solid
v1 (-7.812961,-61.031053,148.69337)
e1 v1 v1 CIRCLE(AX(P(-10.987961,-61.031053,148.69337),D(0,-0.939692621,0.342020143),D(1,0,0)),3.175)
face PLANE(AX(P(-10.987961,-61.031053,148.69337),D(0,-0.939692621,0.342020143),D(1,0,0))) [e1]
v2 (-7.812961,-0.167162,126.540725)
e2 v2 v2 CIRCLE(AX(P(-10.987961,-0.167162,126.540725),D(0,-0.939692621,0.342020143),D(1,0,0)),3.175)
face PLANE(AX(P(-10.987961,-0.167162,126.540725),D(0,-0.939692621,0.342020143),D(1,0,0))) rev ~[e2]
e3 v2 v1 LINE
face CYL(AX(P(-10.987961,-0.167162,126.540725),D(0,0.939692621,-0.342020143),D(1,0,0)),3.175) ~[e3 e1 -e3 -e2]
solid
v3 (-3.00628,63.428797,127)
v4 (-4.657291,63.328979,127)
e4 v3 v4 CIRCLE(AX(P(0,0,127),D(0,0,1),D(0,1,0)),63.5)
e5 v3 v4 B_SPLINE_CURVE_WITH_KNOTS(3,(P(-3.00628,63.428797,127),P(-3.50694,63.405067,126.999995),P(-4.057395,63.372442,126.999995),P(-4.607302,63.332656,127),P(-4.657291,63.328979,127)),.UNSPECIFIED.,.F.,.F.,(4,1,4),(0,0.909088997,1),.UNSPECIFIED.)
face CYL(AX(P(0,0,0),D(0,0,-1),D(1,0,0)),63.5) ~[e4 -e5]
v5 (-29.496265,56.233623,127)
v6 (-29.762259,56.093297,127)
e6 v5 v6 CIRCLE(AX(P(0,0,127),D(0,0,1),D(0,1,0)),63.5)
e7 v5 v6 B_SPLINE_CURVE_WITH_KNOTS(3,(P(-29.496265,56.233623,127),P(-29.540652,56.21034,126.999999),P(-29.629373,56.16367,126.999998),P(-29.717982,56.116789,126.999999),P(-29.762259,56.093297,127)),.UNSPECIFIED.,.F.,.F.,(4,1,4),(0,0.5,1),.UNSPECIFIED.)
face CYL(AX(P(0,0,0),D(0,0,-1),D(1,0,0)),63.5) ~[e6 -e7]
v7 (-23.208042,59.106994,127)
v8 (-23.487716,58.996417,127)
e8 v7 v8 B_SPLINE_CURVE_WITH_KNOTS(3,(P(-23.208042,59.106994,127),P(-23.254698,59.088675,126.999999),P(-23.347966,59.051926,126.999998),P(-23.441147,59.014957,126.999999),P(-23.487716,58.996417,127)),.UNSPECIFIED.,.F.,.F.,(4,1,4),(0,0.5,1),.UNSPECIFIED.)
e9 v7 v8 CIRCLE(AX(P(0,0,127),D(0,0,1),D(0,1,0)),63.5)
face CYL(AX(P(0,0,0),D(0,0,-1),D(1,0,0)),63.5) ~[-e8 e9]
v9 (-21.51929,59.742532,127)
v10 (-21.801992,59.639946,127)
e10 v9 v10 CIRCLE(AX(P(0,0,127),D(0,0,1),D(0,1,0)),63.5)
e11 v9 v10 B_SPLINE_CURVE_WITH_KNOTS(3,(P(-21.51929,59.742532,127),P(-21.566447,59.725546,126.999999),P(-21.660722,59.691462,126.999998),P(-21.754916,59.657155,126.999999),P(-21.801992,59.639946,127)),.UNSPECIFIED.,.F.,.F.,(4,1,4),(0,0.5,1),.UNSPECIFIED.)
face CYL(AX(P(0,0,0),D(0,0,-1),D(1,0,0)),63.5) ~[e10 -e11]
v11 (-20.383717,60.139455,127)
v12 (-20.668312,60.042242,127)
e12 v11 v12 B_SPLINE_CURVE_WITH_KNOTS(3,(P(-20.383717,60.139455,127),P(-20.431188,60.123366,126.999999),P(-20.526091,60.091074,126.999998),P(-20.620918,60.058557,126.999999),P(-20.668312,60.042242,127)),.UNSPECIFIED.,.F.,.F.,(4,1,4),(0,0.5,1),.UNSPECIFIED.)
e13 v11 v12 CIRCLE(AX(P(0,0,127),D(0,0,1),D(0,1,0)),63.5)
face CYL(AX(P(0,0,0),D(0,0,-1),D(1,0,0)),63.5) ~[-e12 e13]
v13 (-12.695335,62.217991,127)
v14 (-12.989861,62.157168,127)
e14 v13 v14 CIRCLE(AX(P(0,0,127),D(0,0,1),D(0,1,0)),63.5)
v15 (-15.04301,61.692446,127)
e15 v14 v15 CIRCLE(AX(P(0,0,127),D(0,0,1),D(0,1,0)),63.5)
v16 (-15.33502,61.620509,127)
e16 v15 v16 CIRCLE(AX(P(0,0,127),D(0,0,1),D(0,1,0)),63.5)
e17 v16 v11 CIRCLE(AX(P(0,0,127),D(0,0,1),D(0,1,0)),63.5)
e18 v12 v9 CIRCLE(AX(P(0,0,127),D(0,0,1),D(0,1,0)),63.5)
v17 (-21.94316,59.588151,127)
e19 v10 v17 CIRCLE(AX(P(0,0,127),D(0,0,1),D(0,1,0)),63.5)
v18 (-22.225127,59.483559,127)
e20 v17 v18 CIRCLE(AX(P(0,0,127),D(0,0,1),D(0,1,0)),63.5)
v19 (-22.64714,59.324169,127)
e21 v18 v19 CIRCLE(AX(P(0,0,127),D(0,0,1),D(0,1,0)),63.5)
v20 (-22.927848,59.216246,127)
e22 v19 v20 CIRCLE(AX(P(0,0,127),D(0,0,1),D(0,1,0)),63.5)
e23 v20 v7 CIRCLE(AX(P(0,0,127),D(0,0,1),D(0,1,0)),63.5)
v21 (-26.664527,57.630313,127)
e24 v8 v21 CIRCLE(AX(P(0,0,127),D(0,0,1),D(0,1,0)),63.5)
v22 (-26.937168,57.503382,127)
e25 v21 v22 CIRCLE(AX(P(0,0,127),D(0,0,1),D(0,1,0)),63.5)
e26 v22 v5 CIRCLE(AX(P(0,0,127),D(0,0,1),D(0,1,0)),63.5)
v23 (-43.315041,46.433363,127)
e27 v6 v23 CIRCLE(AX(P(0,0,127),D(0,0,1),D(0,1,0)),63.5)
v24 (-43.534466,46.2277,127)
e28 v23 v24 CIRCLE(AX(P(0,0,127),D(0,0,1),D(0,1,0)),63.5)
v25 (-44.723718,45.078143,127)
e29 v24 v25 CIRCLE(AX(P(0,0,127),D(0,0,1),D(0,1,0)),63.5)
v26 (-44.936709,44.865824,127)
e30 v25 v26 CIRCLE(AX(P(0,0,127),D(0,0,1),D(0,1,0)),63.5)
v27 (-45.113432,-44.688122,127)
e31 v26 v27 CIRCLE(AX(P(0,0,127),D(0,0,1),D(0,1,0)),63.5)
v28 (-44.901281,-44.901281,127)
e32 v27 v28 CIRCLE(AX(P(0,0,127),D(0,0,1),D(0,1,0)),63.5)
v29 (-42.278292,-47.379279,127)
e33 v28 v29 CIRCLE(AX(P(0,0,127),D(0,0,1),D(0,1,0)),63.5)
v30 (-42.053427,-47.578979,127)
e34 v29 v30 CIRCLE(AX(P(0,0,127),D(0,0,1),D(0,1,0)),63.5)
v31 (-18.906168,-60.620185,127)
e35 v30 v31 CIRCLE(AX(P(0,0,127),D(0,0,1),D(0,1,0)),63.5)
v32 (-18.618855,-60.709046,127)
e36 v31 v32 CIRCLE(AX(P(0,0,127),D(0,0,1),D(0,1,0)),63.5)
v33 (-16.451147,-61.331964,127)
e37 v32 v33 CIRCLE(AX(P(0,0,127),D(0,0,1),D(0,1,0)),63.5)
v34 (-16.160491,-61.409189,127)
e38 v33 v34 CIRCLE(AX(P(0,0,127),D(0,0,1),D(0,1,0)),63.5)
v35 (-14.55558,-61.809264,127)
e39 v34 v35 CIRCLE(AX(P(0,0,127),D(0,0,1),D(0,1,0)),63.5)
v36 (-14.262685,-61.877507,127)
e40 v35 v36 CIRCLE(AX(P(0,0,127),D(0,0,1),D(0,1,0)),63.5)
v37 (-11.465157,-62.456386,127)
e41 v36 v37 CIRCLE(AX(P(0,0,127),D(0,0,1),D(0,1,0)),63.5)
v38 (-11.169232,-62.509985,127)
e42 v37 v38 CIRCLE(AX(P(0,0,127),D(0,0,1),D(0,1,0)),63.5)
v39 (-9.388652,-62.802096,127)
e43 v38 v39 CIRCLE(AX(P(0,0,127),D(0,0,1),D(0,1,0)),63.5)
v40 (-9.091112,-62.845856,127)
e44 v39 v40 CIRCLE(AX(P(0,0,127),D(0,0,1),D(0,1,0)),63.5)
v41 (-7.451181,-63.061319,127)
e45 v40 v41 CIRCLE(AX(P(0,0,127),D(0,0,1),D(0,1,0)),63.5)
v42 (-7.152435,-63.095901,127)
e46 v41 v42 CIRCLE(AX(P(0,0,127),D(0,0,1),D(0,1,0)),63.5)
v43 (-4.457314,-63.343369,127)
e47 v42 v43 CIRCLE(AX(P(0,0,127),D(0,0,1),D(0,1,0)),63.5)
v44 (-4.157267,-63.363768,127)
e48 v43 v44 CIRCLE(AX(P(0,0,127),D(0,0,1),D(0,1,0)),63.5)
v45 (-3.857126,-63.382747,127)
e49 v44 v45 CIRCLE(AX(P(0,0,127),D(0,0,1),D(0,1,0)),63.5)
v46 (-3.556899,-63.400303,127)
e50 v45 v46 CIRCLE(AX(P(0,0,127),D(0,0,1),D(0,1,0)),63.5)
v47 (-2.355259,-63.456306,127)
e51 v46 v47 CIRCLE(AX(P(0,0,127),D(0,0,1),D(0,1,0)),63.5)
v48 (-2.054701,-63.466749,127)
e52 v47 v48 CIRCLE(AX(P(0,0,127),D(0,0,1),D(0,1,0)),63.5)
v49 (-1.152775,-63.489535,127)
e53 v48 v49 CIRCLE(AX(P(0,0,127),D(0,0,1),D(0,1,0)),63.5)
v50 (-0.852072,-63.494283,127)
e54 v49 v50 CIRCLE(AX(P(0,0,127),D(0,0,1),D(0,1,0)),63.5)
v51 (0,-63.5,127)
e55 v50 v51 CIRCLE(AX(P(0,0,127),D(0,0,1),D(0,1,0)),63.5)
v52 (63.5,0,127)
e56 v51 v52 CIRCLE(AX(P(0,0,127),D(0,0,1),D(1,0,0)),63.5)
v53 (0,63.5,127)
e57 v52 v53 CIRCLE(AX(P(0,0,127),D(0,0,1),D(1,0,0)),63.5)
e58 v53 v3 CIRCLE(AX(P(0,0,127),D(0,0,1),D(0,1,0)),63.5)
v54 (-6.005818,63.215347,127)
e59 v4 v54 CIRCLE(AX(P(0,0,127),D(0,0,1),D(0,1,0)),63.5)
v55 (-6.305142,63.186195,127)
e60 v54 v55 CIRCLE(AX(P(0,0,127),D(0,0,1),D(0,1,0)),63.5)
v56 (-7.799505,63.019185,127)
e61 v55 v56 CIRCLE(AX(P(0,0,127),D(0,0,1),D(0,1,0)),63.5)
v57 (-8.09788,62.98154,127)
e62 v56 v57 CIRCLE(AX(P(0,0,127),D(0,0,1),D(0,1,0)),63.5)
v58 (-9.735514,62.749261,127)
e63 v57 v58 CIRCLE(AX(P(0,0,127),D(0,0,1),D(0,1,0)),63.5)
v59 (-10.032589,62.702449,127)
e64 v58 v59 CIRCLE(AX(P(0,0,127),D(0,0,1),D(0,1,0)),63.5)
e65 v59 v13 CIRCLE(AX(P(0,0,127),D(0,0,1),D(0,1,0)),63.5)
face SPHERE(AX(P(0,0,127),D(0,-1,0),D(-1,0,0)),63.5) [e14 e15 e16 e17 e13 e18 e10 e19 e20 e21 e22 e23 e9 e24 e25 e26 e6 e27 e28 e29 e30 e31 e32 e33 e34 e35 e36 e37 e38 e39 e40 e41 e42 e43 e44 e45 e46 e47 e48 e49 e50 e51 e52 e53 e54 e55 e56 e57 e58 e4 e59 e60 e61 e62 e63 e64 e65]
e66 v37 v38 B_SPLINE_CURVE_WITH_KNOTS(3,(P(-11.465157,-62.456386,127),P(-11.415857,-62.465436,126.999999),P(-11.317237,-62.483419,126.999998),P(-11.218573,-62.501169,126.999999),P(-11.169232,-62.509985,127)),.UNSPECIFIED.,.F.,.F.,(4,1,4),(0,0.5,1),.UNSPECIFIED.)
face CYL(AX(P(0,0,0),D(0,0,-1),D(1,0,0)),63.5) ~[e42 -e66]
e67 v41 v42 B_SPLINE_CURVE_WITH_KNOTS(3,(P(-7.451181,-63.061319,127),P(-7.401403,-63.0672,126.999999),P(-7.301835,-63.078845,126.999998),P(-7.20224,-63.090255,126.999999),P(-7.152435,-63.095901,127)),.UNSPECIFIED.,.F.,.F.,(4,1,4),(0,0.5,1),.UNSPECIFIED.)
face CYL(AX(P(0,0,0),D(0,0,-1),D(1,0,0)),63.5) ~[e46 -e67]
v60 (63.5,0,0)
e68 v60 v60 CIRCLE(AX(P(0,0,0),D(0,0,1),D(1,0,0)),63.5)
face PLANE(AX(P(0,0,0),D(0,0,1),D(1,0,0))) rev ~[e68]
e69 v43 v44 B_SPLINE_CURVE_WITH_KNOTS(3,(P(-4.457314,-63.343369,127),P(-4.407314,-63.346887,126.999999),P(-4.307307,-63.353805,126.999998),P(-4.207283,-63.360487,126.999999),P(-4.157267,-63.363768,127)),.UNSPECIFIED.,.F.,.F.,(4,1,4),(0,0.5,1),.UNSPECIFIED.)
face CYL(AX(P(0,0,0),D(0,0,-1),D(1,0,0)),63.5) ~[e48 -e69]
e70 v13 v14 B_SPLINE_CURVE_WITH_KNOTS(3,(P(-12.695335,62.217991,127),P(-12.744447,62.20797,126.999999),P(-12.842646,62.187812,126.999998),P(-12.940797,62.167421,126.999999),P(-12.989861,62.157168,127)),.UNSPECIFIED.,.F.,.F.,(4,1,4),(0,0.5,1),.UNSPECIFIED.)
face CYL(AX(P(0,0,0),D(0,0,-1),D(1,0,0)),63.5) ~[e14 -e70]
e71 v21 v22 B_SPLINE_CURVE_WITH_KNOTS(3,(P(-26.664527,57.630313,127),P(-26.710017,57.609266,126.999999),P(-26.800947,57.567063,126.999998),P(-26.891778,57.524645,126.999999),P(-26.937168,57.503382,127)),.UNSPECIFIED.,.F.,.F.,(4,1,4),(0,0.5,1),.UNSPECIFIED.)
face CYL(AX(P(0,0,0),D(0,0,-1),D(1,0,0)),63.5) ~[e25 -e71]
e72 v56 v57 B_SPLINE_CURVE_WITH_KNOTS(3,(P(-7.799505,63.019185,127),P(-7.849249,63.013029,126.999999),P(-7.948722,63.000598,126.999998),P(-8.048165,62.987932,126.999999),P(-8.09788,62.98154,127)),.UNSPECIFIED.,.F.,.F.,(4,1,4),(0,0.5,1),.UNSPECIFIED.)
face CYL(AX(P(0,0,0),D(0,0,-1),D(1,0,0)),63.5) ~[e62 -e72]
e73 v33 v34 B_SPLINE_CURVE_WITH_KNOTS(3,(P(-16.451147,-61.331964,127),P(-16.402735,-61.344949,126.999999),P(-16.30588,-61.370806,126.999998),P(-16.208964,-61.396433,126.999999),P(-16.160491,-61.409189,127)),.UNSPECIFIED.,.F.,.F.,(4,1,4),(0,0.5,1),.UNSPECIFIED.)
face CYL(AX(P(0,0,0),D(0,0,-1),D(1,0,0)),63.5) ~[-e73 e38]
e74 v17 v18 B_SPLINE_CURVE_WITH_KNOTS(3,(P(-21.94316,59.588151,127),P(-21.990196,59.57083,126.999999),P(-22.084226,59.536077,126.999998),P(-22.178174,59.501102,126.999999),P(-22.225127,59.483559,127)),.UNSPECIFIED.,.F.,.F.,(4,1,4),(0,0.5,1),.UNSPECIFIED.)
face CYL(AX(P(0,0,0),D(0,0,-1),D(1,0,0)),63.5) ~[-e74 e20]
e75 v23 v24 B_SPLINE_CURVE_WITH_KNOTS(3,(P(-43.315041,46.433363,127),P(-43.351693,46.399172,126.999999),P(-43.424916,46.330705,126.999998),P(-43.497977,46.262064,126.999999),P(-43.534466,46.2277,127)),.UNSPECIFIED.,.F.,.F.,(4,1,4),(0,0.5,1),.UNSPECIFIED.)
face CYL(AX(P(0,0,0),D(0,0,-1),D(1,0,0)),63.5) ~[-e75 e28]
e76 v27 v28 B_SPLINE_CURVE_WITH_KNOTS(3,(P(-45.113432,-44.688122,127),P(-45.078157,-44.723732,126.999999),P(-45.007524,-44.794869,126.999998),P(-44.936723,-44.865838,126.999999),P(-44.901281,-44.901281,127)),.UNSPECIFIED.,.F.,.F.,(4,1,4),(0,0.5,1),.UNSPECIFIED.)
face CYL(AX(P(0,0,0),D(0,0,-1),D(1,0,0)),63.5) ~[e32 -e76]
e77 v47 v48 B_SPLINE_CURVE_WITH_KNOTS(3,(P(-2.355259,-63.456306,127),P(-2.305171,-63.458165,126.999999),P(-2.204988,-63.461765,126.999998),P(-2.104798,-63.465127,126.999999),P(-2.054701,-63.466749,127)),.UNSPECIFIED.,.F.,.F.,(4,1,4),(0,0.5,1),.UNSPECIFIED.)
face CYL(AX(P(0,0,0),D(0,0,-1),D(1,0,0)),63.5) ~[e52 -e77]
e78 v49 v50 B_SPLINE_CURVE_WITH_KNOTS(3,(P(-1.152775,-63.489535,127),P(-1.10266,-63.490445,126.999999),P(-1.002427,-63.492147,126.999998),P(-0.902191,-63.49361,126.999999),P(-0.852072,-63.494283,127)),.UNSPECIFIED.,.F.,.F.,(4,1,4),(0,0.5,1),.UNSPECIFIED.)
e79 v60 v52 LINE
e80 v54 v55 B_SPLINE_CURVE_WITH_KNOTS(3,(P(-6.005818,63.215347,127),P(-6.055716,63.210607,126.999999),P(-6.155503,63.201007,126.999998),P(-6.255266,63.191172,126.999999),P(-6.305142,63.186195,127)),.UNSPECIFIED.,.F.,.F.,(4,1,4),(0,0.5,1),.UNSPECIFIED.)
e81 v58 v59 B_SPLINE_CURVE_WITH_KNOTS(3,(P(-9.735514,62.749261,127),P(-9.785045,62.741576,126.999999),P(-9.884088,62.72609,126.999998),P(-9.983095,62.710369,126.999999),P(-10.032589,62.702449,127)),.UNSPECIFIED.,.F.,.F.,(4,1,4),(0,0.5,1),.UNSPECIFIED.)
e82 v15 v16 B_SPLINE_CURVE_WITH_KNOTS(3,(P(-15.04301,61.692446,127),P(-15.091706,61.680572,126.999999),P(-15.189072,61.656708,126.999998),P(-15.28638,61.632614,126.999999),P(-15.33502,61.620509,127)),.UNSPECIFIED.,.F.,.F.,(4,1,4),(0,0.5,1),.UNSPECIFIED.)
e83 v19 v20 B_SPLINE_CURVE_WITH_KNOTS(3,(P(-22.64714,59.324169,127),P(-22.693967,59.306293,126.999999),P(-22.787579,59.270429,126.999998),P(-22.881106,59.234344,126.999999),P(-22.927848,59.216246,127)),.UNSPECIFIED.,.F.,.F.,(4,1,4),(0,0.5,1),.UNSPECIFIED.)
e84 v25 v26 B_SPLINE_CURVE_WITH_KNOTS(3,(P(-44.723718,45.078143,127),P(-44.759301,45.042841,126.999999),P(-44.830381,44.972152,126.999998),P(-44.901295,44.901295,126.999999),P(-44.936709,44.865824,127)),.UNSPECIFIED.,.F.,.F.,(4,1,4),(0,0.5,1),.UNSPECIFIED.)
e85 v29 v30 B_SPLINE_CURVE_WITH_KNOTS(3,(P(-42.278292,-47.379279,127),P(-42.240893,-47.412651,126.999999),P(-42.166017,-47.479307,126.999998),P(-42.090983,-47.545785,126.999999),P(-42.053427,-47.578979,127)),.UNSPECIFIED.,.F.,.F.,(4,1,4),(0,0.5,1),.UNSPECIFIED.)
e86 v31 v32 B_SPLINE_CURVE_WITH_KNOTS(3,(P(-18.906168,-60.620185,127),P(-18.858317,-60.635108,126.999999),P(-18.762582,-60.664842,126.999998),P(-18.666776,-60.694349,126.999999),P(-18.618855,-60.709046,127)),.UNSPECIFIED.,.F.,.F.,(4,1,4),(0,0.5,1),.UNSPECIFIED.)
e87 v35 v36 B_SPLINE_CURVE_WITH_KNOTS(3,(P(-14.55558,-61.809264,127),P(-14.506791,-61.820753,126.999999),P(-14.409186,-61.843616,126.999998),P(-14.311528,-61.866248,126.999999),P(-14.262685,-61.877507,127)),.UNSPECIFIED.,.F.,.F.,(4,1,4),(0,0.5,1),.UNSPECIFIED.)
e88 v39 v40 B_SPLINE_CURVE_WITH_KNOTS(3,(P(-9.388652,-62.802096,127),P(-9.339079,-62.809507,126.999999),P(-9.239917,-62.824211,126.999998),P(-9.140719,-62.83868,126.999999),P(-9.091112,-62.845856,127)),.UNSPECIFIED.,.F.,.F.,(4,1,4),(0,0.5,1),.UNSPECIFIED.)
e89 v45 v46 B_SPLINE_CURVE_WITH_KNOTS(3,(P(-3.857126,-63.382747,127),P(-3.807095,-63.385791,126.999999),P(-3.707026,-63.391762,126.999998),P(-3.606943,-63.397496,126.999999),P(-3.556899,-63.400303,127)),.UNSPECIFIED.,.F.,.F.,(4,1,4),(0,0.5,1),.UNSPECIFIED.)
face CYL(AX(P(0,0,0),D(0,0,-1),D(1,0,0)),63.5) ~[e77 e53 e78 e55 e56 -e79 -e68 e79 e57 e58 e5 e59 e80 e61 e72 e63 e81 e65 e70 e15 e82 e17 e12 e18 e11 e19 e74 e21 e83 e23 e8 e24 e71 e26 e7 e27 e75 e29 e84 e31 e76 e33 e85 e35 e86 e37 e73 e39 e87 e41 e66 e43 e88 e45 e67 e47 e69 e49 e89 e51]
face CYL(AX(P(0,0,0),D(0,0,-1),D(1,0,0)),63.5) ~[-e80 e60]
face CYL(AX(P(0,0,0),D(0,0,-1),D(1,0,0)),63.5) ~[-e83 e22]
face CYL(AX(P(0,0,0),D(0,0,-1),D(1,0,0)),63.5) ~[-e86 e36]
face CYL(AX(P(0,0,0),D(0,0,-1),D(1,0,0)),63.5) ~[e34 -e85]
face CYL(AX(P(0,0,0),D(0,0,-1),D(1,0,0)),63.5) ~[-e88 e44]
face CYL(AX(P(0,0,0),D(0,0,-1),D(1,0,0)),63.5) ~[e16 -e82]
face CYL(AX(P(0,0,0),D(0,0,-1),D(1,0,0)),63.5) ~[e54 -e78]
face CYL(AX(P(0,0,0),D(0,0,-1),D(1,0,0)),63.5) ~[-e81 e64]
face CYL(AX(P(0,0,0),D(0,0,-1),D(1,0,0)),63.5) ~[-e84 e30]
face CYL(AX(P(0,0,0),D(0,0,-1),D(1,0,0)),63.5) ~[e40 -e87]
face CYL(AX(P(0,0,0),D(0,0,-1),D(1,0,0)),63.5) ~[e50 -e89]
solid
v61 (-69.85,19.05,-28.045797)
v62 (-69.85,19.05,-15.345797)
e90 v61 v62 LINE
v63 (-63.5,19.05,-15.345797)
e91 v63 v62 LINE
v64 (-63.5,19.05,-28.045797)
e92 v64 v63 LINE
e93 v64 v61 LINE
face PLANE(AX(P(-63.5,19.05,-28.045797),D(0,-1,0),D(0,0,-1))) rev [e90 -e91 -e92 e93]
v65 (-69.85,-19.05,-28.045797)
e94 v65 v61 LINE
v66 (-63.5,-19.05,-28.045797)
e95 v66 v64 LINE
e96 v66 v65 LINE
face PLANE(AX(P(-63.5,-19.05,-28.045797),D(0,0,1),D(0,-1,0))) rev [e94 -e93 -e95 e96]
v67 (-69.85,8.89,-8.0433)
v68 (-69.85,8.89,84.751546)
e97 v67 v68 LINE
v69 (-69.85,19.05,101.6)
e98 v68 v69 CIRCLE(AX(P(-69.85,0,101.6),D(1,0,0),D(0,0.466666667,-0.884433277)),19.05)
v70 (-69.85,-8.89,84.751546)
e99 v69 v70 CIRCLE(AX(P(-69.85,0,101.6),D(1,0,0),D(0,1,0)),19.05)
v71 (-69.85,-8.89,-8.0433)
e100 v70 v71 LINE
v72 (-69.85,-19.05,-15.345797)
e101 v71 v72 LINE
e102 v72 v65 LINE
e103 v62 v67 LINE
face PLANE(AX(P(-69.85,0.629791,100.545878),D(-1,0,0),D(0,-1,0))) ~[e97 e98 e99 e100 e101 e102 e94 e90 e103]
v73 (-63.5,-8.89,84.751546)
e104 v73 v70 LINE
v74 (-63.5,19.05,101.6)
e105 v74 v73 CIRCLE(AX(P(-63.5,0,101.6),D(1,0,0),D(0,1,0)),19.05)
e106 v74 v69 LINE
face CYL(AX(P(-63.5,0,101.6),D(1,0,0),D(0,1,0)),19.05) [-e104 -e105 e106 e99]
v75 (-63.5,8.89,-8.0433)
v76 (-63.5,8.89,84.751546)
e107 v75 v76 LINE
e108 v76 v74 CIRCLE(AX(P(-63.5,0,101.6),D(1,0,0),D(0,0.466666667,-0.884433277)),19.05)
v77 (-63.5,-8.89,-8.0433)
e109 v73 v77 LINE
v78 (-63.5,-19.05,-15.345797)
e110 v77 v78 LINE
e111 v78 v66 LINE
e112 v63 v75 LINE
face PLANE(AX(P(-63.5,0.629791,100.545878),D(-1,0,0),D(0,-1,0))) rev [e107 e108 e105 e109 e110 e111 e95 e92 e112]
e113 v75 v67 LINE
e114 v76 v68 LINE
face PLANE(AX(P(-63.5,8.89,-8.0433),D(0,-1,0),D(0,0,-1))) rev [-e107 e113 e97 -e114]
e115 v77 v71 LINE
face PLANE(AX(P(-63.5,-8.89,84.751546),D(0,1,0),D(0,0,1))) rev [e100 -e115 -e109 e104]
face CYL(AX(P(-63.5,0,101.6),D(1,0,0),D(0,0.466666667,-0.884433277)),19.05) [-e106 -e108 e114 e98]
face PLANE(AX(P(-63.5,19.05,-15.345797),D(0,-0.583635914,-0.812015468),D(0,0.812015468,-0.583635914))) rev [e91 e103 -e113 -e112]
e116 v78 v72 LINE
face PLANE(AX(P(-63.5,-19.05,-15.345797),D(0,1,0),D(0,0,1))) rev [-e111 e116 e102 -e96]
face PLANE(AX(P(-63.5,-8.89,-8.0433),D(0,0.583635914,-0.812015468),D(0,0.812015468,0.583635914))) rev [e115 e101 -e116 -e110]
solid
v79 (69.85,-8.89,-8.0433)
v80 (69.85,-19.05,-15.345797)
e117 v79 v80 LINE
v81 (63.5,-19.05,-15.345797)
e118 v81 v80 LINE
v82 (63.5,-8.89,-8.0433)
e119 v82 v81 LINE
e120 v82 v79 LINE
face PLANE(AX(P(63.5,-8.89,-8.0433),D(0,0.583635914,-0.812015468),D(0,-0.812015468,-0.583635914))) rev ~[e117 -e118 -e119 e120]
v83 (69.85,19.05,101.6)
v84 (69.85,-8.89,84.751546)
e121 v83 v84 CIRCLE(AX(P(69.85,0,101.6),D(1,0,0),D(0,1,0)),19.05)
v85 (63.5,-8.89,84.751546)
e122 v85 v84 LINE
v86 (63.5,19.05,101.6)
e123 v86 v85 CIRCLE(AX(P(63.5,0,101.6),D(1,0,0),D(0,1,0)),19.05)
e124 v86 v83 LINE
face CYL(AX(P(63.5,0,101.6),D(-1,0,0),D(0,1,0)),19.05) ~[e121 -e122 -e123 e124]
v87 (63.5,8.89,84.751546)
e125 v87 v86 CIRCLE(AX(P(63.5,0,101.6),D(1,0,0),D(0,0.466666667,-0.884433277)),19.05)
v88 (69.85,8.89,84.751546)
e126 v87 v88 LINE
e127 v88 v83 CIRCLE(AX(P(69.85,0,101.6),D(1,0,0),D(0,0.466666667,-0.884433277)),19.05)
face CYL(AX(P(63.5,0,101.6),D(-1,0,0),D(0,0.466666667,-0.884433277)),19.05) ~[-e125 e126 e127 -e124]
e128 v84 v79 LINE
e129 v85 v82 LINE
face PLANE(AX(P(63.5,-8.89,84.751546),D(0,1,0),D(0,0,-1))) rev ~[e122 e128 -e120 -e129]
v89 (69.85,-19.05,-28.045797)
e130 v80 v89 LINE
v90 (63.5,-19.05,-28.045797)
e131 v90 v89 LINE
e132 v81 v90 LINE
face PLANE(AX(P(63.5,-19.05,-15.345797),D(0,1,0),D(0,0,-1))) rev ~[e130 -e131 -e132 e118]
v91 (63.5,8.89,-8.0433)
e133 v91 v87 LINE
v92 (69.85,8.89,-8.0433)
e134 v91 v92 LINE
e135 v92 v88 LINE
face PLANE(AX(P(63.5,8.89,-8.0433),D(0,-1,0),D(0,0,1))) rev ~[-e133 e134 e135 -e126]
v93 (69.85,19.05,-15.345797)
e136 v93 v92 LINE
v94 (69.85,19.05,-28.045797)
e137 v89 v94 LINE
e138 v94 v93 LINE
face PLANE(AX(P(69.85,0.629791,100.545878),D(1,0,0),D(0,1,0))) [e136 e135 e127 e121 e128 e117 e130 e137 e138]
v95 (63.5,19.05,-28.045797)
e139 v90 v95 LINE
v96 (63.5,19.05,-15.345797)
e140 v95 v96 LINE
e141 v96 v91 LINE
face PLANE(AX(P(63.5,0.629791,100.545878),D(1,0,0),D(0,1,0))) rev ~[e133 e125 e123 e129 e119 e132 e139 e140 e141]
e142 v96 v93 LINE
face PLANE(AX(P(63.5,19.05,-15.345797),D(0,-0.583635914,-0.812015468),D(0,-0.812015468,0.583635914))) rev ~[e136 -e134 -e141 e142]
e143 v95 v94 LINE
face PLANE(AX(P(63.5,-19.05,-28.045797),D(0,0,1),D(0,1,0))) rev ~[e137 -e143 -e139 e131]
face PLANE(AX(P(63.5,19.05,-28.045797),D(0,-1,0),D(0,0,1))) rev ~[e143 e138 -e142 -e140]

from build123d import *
from build123d import SkipClean  # not in build123d's __all__

# Parameters (mm, degrees)
F0_R      = 63.5
F1_DEPTH  = 127
F6_DEPTH  = 6.35
F10_R     = 3.175
F11_DEPTH = 64.77


with BuildPart() as f1:
    # F0 (on Top) → F1 (new body)
    with BuildSketch(Plane.XY):
        Circle(F0_R)
    extrude(amount=F1_DEPTH)

    # F2 (on face) → F3 (revolve)
    with BuildSketch(Plane.XY.offset(127)):
        with BuildLine():
            Line((0, -63.5), (0, 63.5))
            ThreePointArc((0, 63.5), (-63.5, 0), (0, -63.5))
        make_face()
    with SkipClean():  # cleaning this boolean's faces spoils the solid; the shape is the same uncleaned
        revolve(axis=Axis((0, 0, 127), (0, -1, 0)))


with BuildPart() as f6:
    # F5 (on offset) → F6 (new body)
    with BuildSketch(Plane.YZ.offset(63.5)):
        with BuildLine():
            ThreePointArc((8.89, 84.751546065), (16.3134453749, 91.7626223006), (19.05, 101.6))
            ThreePointArc((19.05, 101.6), (-9.8373776994, 117.9134453749), (-8.89, 84.751546065))
            ThreePointArc((-8.89, 84.751546065), (0, 82.55), (8.89, 84.751546065))
        make_face()
        with BuildLine():
            ThreePointArc((8.89, 84.751546065), (0, 82.55), (-8.89, 84.751546065))
            Line((-8.89, 84.751546065), (-8.89, -8.0432999057))
            Line((-8.89, -8.0432999057), (-19.05, -15.3457973657))
            Line((-19.05, -15.3457973657), (-19.05, -28.0457973657))
            Line((-19.05, -28.0457973657), (19.05, -28.0457973657))
            Line((19.05, -28.0457973657), (19.05, -15.3457973657))
            Line((19.05, -15.3457973657), (8.89, -8.0432999057))
            Line((8.89, -8.0432999057), (8.89, 84.751546065))
        make_face()
    extrude(amount=F6_DEPTH)


with BuildPart() as f7_1:
    # F7: instance of F6
    add(f6.part.mirror(Plane.YZ), clean=False)


with BuildPart() as f11:
    # F10 (on line) → F11 (new body)
    with BuildSketch(Plane(origin=(0, -40.8170132151, 14.8561778619), x_dir=(1, 0, 0), z_dir=(0, -0.9396926208, 0.3420201433))):
        with Locations((-10.9879607335, 118.8522130251)):
            Circle(F10_R)
    extrude(amount=F11_DEPTH)


solid = Compound([f1.part, f6.part, f7_1.part, f11.part])
